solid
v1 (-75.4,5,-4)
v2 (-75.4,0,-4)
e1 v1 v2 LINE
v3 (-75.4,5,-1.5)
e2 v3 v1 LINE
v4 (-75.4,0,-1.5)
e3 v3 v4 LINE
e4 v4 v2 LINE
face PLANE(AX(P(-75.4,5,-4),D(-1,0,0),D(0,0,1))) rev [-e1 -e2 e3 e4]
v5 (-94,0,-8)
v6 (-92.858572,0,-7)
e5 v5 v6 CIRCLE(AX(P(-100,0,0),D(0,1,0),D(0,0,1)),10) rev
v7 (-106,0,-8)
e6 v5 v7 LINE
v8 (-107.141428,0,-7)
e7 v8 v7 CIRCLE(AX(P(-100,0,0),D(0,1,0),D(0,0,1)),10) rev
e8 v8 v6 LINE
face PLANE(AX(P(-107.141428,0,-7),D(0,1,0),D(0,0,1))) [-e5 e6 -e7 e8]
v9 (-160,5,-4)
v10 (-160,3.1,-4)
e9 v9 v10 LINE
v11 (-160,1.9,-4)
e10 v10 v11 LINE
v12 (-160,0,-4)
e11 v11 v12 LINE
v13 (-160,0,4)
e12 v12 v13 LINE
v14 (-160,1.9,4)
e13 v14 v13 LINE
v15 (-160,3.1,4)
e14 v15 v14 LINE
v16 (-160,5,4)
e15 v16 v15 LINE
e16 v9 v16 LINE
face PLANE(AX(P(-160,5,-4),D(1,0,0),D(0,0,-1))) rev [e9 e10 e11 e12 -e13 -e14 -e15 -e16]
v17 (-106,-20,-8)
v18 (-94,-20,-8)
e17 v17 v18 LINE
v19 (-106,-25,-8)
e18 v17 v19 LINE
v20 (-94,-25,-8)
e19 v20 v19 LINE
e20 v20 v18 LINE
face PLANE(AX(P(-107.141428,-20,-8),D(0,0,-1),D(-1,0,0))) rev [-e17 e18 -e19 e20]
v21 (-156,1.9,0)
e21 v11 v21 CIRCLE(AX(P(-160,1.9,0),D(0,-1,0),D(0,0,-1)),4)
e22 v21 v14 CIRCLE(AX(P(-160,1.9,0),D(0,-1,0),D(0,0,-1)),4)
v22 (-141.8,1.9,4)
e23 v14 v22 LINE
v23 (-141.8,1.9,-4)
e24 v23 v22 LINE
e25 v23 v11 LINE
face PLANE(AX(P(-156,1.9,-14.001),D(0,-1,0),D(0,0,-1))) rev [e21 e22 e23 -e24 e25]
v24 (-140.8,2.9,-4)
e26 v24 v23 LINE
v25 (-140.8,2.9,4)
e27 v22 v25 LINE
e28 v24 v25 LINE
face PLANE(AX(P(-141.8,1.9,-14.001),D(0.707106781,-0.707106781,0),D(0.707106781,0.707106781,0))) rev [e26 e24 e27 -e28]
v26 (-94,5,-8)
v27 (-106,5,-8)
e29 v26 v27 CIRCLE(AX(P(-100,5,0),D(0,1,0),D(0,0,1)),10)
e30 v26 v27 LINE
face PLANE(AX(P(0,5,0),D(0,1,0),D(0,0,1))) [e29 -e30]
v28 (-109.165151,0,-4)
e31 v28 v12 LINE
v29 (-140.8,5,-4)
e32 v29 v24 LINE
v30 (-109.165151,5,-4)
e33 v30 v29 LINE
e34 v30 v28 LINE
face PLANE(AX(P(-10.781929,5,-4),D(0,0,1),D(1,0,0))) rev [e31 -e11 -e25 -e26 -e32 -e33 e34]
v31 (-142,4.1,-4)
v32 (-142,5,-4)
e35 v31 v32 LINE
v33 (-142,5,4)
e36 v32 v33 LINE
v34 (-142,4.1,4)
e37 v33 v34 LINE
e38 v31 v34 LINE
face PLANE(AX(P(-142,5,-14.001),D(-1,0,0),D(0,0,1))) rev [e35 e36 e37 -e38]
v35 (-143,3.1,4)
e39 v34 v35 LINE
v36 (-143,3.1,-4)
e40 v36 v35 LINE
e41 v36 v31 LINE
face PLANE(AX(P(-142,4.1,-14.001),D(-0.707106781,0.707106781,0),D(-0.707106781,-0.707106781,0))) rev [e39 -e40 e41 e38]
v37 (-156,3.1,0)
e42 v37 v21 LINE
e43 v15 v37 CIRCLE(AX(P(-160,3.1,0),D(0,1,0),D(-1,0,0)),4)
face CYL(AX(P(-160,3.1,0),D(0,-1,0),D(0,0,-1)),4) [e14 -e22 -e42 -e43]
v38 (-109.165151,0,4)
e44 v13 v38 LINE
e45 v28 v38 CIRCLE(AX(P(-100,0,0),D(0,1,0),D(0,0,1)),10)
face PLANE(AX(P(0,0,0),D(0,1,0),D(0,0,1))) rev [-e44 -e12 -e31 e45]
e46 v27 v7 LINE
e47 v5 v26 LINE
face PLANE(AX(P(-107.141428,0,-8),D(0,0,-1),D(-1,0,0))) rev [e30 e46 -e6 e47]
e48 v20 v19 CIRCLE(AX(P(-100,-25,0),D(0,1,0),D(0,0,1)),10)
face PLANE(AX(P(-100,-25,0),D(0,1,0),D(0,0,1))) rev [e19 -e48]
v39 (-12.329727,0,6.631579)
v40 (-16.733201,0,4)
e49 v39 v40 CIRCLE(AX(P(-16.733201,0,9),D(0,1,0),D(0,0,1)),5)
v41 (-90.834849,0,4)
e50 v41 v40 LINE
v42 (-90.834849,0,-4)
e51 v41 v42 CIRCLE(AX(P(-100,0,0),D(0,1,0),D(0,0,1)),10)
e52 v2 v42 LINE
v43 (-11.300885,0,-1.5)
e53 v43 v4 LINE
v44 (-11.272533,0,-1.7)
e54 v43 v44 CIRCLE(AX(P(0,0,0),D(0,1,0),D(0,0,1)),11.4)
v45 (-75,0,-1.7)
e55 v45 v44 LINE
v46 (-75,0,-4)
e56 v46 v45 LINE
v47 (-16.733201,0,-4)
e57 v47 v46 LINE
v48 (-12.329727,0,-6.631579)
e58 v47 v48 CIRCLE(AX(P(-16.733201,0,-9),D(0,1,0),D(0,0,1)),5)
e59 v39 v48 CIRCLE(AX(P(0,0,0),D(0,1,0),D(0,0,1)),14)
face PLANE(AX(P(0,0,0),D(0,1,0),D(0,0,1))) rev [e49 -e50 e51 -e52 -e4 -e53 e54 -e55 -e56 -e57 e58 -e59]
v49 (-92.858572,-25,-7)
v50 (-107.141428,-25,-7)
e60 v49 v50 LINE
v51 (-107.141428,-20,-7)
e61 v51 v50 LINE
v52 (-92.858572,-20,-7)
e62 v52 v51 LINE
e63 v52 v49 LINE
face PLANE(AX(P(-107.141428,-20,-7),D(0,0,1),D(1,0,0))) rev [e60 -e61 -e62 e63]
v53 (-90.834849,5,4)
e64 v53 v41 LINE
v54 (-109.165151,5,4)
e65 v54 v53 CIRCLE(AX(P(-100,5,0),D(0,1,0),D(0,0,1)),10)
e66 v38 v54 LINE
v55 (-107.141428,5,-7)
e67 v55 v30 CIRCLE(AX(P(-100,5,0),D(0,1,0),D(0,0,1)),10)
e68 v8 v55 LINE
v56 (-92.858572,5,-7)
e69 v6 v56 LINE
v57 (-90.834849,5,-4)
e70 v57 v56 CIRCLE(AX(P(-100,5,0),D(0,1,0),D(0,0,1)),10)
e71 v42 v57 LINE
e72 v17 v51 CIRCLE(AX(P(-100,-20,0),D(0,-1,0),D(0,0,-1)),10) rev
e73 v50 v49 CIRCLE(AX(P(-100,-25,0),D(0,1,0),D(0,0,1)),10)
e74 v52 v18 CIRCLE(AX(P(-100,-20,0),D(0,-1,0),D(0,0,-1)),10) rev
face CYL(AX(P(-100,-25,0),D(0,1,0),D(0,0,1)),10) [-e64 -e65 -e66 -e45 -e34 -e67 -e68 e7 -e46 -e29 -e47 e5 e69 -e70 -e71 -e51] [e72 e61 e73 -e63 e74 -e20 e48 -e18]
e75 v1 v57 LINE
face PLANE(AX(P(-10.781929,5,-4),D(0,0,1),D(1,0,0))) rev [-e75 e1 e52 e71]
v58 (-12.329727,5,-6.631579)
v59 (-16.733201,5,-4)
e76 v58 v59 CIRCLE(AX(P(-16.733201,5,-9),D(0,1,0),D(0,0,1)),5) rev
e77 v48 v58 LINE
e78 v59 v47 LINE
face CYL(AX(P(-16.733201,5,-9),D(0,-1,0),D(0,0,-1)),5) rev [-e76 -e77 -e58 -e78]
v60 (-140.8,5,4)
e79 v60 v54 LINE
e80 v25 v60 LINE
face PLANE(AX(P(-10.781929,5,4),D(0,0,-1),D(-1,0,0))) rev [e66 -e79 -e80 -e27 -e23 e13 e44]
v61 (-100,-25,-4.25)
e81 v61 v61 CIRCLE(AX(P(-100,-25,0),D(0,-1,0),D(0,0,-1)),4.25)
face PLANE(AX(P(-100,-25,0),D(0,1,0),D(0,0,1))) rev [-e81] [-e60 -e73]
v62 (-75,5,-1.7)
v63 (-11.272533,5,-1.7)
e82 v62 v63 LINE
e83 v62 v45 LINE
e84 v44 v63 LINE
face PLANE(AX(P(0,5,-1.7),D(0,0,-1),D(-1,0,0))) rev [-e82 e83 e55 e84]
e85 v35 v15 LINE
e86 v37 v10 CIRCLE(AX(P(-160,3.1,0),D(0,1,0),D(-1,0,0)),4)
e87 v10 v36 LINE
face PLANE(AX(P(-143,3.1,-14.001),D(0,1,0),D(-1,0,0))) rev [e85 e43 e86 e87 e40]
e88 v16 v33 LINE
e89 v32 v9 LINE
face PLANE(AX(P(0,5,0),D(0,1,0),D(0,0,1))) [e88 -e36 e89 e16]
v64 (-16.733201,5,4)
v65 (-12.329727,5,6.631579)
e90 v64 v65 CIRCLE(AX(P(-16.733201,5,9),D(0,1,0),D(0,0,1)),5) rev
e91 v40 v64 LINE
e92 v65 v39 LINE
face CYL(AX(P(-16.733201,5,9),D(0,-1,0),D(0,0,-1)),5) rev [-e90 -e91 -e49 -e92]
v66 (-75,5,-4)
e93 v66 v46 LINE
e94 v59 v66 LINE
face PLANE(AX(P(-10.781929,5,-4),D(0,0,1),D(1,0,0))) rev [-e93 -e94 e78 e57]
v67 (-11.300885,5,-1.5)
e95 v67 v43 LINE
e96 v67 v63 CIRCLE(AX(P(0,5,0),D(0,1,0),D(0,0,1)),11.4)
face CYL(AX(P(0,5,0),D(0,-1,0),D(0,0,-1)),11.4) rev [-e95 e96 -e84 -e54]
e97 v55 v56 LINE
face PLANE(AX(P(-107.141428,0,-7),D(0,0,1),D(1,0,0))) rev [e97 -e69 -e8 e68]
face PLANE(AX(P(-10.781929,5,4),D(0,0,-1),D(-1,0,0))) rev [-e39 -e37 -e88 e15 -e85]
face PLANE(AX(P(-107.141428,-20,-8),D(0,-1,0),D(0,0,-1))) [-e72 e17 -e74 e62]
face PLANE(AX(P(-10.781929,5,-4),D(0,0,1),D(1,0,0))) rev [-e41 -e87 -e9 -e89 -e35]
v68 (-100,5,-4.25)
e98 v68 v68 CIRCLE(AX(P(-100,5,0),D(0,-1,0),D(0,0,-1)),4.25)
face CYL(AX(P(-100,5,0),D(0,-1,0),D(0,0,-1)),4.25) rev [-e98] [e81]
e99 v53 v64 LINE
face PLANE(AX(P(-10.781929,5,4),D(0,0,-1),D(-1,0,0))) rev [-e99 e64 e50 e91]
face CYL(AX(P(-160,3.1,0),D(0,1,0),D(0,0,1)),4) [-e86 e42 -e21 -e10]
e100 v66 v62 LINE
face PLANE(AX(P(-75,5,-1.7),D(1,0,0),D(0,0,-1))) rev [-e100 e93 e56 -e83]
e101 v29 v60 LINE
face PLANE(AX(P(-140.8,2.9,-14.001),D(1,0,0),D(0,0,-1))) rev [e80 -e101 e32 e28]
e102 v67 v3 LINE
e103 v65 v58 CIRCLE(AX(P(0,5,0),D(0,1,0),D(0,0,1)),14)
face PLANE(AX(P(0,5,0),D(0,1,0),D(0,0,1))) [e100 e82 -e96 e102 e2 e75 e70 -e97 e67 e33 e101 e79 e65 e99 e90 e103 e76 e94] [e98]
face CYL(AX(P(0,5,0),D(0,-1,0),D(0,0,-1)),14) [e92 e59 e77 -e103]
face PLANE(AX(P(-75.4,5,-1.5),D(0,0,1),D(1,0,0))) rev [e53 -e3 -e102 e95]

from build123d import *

# Parameters (mm, degrees)
SKETCH_1_R              = 14
SKETCH_1_R_2            = 11.4
RING_DEPTH              = 5
STICK_DEPTH             = 5
FILLET_1_R              = 5
CORRECTION_HOLE_1_DEPTH = 161.68914089
CUT_EXTRUDE_1_REACH     = 163.087
FILLET_2_R              = 4
SKETCH_10_R             = 10
EXTRUDE_2_DEPTH         = 30
SKETCH_11_R             = 4.25
CUT_EXTRUDE_3_DEPTH     = 30
SKETCH_12_W             = 14.282856858
SKETCH_12_H             = 1
CUT_EXTRUDE_4_DEPTH     = 5
SKETCH_13_W             = 14.282856858
SKETCH_13_H             = 1
CUT_EXTRUDE_6_DEPTH     = 5


with BuildPart() as part:
    # Эскиз1 → ring (new body)
    with BuildSketch(Plane(origin=(0, 0, 0), x_dir=(1, 0, 0), z_dir=(0, 1, 0))):
        with Locations(Location((0, 0, 0), (0, 0, 270))):
            Circle(SKETCH_1_R)
        with Locations(Location((0, 0, 0), (0, 0, 270))):
            Circle(SKETCH_1_R_2, mode=Mode.SUBTRACT)
    extrude(amount=RING_DEPTH)

    # Эскиз2 → stick (add)
    with BuildSketch(Plane(origin=(0, 0, 0), x_dir=(1, 0, 0), z_dir=(0, 1, 0))):
        with BuildLine():
            Line((-10.781929326, 4), (-160, 4))
            Line((-160, 4), (-160, -4))
            Line((-160, -4), (-10.781929326, -4))
            ThreePointArc((-10.781929326, -4), (-11.5, 0), (-10.781929326, 4))
        make_face()
    extrude(amount=STICK_DEPTH)

    # Скругление1
    fillet_1_edges = [part.edges().sort_by_distance(p)[0] for p in [
        (-13.416407865, 2.5, 4),
        (-13.416407865, 2.5, -4),
    ]]
    fillet(fillet_1_edges, radius=FILLET_1_R)

    # Эскиз5 → correction hole 1 (cut, through all)
    with BuildSketch(Plane.XZ):
        Polygon((-75.4, -4), (-75.4, -1.5), (0, -1.5), (0, -1.7), (-75, -1.7), (-75, -4), align=None)
    extrude(amount=-CORRECTION_HOLE_1_DEPTH, mode=Mode.SUBTRACT)

    # Эскиз9 → Вытянуть1 (cut, up to next)
    with BuildSketch(Plane.XY.offset(4), mode=Mode.PRIVATE) as cut_extrude_1_sk1:
        Polygon((-142, 5), (-142, 4.1), (-143, 3.1), (-156, 3.1), (-156, 1.9), (-141.8, 1.9), (-140.8, 2.9), (-140.8, 5), align=None)
    cut_extrude_1_tool1 = extrude(cut_extrude_1_sk1.sketch, amount=-CUT_EXTRUDE_1_REACH, mode=Mode.PRIVATE) & part.part
    add(cut_extrude_1_tool1.solids().sort_by_distance((-147.651462, 2.701462, 4))[0], mode=Mode.SUBTRACT)

    # Скругление2
    fillet_2_edges = [part.edges().sort_by_distance(p)[0] for p in [
        (-156, 2.5, -4),
        (-156, 2.5, 4),
    ]]
    fillet(fillet_2_edges, radius=FILLET_2_R - 0.0001)  # a hair under: the kernel refuses the full size

    # Эскиз10 → Вытянуть2 (add)
    with BuildSketch(Plane(origin=(0, 5, 0), x_dir=(1, 0, 0), z_dir=(0, 1, 0))):
        with Locations(Location((-100, 0, 0), (0, 0, 270))):
            Circle(SKETCH_10_R)
    extrude(amount=-EXTRUDE_2_DEPTH)

    # Эскиз11 → Вытянуть3 (cut)
    with BuildSketch(Plane.XZ.offset(25)):
        with Locations(Location((-100, 0, 0), (0, 0, 270))):
            Circle(SKETCH_11_R)
    extrude(amount=-CUT_EXTRUDE_3_DEPTH, mode=Mode.SUBTRACT)

    # Эскиз12 → Вытянуть4 (cut)
    with BuildSketch(Plane.XZ.offset(25)):
        with Locations((-100, -7.5)):
            Rectangle(SKETCH_12_W, SKETCH_12_H)
    extrude(amount=-CUT_EXTRUDE_4_DEPTH, mode=Mode.SUBTRACT)

    # Эскиз13 → Вытянуть6 (cut)
    with BuildSketch(Plane(origin=(0, 5, 0), x_dir=(1, 0, 0), z_dir=(0, 1, 0))):
        with Locations((-100, 7.5)):
            Rectangle(SKETCH_13_W, SKETCH_13_H)
    extrude(amount=-CUT_EXTRUDE_6_DEPTH, mode=Mode.SUBTRACT)


solid = part.part
